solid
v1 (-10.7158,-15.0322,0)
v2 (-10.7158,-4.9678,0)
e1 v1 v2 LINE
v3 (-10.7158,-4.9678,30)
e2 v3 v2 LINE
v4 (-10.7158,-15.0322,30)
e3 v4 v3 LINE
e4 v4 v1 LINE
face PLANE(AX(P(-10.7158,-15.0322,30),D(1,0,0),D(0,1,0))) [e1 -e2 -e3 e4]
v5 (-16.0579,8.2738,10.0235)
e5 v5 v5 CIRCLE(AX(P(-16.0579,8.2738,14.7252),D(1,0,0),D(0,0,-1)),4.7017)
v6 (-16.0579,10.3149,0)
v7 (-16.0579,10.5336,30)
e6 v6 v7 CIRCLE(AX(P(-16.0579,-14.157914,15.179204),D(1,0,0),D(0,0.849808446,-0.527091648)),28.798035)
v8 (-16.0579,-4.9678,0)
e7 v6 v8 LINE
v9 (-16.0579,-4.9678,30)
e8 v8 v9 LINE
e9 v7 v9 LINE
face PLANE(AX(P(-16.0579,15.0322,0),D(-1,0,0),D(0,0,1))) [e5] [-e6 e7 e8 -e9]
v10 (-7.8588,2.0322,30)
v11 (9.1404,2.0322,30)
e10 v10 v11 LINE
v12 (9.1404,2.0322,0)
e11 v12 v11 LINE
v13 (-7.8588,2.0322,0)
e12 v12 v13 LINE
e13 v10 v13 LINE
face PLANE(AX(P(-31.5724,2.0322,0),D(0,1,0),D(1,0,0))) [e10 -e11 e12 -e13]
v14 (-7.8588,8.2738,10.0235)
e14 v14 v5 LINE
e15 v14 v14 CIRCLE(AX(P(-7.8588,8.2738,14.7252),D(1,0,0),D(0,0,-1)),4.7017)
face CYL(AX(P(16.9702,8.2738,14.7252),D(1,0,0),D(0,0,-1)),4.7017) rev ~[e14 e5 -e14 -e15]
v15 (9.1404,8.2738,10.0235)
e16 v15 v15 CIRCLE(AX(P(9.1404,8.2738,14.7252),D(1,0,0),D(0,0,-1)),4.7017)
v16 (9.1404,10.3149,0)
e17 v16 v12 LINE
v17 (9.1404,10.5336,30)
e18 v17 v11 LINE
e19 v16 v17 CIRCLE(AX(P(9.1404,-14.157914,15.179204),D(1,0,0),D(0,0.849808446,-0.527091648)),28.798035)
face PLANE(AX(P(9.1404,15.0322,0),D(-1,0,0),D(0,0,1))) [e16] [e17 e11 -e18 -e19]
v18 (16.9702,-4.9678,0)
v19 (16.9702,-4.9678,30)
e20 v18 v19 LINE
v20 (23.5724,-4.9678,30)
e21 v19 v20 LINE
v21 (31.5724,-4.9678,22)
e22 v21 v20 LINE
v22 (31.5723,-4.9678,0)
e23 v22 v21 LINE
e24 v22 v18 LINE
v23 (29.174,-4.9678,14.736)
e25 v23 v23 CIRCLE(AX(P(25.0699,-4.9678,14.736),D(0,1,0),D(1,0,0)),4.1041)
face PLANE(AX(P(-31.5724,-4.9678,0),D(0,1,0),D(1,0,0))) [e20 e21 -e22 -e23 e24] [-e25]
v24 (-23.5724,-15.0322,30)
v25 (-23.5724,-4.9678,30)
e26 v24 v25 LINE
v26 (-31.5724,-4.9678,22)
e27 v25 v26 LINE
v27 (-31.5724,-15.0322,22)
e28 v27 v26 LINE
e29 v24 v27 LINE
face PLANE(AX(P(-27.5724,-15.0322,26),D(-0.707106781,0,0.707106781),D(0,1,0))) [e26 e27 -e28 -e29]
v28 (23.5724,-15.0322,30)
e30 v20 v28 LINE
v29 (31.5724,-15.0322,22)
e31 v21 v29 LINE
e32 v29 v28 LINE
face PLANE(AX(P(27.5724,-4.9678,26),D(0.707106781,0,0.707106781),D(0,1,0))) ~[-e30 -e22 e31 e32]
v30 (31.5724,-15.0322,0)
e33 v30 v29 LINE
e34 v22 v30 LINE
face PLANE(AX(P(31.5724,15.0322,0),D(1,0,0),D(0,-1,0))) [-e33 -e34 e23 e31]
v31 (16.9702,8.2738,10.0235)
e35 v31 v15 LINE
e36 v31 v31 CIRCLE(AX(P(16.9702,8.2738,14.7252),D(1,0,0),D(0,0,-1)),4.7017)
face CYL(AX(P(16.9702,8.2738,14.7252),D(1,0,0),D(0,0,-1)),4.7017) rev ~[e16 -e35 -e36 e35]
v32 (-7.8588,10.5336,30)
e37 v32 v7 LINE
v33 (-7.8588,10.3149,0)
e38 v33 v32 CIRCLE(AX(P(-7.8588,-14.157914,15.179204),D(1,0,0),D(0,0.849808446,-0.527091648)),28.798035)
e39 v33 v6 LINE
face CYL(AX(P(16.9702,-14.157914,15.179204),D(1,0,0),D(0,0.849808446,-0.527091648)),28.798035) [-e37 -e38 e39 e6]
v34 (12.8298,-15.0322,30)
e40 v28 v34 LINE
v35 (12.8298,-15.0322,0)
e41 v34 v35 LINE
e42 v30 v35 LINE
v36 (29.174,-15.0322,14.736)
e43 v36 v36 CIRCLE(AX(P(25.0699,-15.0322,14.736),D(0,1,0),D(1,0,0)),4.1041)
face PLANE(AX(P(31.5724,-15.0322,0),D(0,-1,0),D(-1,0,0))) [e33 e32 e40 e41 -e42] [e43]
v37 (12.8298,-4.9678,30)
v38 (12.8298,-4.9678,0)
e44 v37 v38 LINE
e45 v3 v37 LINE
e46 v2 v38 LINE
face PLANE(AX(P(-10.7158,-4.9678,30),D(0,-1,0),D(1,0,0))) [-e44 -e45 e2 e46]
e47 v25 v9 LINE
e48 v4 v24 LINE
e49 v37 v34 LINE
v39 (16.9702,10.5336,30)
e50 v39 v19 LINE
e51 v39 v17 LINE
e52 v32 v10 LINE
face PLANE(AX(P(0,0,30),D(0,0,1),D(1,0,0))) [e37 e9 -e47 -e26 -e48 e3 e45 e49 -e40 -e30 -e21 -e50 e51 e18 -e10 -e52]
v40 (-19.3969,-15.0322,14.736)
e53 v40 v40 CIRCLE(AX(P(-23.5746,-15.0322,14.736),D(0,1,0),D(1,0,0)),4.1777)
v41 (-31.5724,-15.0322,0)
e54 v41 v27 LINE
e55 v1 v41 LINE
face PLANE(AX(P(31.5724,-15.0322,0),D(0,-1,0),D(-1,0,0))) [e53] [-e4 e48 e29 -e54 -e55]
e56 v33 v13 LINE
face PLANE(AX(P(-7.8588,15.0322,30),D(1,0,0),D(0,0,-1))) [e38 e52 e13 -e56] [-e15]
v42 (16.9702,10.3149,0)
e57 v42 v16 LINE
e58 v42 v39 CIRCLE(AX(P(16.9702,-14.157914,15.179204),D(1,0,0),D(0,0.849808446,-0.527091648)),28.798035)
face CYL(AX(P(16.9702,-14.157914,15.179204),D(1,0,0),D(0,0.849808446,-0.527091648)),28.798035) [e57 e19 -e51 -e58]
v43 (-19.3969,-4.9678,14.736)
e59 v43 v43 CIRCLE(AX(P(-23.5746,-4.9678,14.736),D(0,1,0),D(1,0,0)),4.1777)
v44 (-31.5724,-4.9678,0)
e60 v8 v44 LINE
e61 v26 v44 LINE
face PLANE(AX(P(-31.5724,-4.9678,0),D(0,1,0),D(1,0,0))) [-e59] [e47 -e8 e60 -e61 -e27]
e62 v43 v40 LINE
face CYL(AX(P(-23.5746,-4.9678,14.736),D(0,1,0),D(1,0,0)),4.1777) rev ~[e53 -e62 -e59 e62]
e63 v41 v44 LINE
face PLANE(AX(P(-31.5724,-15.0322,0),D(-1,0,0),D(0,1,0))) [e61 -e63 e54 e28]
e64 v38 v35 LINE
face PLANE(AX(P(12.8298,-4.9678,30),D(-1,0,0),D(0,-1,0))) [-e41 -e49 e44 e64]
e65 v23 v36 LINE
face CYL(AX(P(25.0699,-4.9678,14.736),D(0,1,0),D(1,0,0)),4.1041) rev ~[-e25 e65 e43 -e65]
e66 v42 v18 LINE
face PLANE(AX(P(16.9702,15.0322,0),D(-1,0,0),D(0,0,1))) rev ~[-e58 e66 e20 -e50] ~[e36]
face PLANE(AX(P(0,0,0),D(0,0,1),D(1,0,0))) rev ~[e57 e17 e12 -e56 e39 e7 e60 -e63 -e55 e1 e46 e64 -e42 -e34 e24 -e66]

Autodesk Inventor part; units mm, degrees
ref_plane "YZ Plane" through (0, 0, 0) normal (1, 0, 0) x (0, 1, 0)
ref_plane "XZ Plane" through (0, 0, 0) normal (0, 1, 0) x (-1, 0, 0)
ref_plane "XY Plane" through (0, 0, 0) normal (0, 0, 1) x (1, 0, 0)
sketch "스케치1" plane through (0, 0, 0) normal (0, 0, 1) x (1, 0, 0)
  line L0 (31.5724, -15.0322) -> (-31.5724, -15.0322)
  line L1 (-31.5724, -15.0322) -> (-31.5724, 15.0322)
  line L2 (-31.5724, 15.0322) -> (31.5724, 15.0322)
  line L3 (31.5724, 15.0322) -> (31.5724, -15.0322)
  line L4 (31.5724, -15.0322) -> (-31.5724, 15.0322) construction
  line L5 (-31.5724, -15.0322) -> (31.5724, 15.0322) construction
  point P0 (0, 0)
extrude "돌출1" add sketch "스케치1" along normal blind 30
sketch "스케치2" plane through (-31.5724, 15.0322, 0) normal (0, 1, 0) x (1, 0, 0)
  point P0 (31.5724, 0)
sketch "스케치3" plane through (-31.5724, 15.0322, 0) normal (0, 1, 0) x (1, 0, 0)
  line L0 (63.1447, 0) -> (0, 0) projected
  line L1 (15.5145, 0) -> (15.5145, -30)
  line L2 (0, -30) -> (63.1447, -30) projected
  line L3 (48.5426, 0) -> (48.5426, -30)
  line L4 (63.1447, -30) -> (0, -30) projected
  line L5 (15.5145, -30) -> (0, -30)
  line L6 (0, 0) -> (63.1447, 0) projected
  line L7 (0, -30) -> (0, 0)
  line L8 (0, 0) -> (15.5145, 0)
  line L9 (48.5426, 0) -> (63.1447, 0)
  line L10 (63.1447, 0) -> (63.1447, -30)
  line L11 (63.1447, -30) -> (48.5426, -30)
  line L12 (23.7136, 0) -> (40.7128, 0)
  line L13 (40.7128, 0) -> (40.7128, -30)
  line L14 (40.7128, -30) -> (23.7136, -30)
  line L15 (23.7136, -30) -> (23.7136, 0)
  point P0 (31.5724, 0)
extrude "돌출2" cut sketch "스케치3" against normal blind 20 contours L10 L2 L3 L0 | L1 L2 L7 L0
extrude "돌출3" cut sketch "스케치3" against normal blind 13 contours L13 L2 L15 L0
sketch "스케치4" plane through (0, 0, 30) normal (0, 0, 1) x (1, 0, 0)
  line L0 (-31.5724, -15.0322) -> (31.5724, -15.0322) projected
  line L1 (-10.7158, -4.9678) -> (12.8298, -4.9678)
  line L2 (12.8298, -4.9678) -> (12.8298, -15.0322)
  line L3 (12.8298, -15.0322) -> (-10.7158, -15.0322)
  line L4 (-10.7158, -15.0322) -> (-10.7158, -4.9678)
  point P0 (0, 0)
extrude "돌출4" cut sketch "스케치4" against normal blind 50
sketch "스케치5" plane through (16.9702, 15.0322, 30) normal (1, 0, 0) x (0, 0, -1)
  circle A0 centre (15.2748, -6.7584) radius 4.7017
  point P0 (30, -15.0322)
extrude "돌출5" cut sketch "스케치5" against normal blind 50
sketch "스케치6" plane through (-31.5724, -4.9678, 0) normal (0, 1, 0) x (1, 0, 0)
  circle A0 centre (56.6423, -14.736) radius 4.1041
  circle A1 centre (7.9978, -14.736) radius 4.1777
  point P0 (31.5724, 0)
extrude "돌출6" cut sketch "스케치6" against normal blind 50
chamfer "모따기1" distance 8 angle 45 2 edges at (-31.5724, -10, 30) (31.5724, -10, 30)
sketch "스케치7" plane through (16.9702, 15.0322, 30) normal (1, 0, 0) x (0, 0, -1)
  point P0 (30, -15.0322)
sketch "스케치8" plane through (16.9702, 15.0322, 30) normal (1, 0, 0) x (0, 0, -1)
  line L0 (30, 0) -> (30, -20) projected
  line L1 (0, 0) -> (0, -13) projected
  arc A0 (30, -4.7173) -> (0, -4.4986) centre (14.8208, -29.1901) ccw
  line L2 (0, -4.4986) -> (0, 0)
  line L3 (0, 0) -> (30, 0) projected
  line L4 (30, 0) -> (30, -4.7173)
  point P0 (30, -15.0322)
extrude "돌출7" cut sketch "스케치8" against normal blind 50
properties part number "240510_3Dsketch07"
